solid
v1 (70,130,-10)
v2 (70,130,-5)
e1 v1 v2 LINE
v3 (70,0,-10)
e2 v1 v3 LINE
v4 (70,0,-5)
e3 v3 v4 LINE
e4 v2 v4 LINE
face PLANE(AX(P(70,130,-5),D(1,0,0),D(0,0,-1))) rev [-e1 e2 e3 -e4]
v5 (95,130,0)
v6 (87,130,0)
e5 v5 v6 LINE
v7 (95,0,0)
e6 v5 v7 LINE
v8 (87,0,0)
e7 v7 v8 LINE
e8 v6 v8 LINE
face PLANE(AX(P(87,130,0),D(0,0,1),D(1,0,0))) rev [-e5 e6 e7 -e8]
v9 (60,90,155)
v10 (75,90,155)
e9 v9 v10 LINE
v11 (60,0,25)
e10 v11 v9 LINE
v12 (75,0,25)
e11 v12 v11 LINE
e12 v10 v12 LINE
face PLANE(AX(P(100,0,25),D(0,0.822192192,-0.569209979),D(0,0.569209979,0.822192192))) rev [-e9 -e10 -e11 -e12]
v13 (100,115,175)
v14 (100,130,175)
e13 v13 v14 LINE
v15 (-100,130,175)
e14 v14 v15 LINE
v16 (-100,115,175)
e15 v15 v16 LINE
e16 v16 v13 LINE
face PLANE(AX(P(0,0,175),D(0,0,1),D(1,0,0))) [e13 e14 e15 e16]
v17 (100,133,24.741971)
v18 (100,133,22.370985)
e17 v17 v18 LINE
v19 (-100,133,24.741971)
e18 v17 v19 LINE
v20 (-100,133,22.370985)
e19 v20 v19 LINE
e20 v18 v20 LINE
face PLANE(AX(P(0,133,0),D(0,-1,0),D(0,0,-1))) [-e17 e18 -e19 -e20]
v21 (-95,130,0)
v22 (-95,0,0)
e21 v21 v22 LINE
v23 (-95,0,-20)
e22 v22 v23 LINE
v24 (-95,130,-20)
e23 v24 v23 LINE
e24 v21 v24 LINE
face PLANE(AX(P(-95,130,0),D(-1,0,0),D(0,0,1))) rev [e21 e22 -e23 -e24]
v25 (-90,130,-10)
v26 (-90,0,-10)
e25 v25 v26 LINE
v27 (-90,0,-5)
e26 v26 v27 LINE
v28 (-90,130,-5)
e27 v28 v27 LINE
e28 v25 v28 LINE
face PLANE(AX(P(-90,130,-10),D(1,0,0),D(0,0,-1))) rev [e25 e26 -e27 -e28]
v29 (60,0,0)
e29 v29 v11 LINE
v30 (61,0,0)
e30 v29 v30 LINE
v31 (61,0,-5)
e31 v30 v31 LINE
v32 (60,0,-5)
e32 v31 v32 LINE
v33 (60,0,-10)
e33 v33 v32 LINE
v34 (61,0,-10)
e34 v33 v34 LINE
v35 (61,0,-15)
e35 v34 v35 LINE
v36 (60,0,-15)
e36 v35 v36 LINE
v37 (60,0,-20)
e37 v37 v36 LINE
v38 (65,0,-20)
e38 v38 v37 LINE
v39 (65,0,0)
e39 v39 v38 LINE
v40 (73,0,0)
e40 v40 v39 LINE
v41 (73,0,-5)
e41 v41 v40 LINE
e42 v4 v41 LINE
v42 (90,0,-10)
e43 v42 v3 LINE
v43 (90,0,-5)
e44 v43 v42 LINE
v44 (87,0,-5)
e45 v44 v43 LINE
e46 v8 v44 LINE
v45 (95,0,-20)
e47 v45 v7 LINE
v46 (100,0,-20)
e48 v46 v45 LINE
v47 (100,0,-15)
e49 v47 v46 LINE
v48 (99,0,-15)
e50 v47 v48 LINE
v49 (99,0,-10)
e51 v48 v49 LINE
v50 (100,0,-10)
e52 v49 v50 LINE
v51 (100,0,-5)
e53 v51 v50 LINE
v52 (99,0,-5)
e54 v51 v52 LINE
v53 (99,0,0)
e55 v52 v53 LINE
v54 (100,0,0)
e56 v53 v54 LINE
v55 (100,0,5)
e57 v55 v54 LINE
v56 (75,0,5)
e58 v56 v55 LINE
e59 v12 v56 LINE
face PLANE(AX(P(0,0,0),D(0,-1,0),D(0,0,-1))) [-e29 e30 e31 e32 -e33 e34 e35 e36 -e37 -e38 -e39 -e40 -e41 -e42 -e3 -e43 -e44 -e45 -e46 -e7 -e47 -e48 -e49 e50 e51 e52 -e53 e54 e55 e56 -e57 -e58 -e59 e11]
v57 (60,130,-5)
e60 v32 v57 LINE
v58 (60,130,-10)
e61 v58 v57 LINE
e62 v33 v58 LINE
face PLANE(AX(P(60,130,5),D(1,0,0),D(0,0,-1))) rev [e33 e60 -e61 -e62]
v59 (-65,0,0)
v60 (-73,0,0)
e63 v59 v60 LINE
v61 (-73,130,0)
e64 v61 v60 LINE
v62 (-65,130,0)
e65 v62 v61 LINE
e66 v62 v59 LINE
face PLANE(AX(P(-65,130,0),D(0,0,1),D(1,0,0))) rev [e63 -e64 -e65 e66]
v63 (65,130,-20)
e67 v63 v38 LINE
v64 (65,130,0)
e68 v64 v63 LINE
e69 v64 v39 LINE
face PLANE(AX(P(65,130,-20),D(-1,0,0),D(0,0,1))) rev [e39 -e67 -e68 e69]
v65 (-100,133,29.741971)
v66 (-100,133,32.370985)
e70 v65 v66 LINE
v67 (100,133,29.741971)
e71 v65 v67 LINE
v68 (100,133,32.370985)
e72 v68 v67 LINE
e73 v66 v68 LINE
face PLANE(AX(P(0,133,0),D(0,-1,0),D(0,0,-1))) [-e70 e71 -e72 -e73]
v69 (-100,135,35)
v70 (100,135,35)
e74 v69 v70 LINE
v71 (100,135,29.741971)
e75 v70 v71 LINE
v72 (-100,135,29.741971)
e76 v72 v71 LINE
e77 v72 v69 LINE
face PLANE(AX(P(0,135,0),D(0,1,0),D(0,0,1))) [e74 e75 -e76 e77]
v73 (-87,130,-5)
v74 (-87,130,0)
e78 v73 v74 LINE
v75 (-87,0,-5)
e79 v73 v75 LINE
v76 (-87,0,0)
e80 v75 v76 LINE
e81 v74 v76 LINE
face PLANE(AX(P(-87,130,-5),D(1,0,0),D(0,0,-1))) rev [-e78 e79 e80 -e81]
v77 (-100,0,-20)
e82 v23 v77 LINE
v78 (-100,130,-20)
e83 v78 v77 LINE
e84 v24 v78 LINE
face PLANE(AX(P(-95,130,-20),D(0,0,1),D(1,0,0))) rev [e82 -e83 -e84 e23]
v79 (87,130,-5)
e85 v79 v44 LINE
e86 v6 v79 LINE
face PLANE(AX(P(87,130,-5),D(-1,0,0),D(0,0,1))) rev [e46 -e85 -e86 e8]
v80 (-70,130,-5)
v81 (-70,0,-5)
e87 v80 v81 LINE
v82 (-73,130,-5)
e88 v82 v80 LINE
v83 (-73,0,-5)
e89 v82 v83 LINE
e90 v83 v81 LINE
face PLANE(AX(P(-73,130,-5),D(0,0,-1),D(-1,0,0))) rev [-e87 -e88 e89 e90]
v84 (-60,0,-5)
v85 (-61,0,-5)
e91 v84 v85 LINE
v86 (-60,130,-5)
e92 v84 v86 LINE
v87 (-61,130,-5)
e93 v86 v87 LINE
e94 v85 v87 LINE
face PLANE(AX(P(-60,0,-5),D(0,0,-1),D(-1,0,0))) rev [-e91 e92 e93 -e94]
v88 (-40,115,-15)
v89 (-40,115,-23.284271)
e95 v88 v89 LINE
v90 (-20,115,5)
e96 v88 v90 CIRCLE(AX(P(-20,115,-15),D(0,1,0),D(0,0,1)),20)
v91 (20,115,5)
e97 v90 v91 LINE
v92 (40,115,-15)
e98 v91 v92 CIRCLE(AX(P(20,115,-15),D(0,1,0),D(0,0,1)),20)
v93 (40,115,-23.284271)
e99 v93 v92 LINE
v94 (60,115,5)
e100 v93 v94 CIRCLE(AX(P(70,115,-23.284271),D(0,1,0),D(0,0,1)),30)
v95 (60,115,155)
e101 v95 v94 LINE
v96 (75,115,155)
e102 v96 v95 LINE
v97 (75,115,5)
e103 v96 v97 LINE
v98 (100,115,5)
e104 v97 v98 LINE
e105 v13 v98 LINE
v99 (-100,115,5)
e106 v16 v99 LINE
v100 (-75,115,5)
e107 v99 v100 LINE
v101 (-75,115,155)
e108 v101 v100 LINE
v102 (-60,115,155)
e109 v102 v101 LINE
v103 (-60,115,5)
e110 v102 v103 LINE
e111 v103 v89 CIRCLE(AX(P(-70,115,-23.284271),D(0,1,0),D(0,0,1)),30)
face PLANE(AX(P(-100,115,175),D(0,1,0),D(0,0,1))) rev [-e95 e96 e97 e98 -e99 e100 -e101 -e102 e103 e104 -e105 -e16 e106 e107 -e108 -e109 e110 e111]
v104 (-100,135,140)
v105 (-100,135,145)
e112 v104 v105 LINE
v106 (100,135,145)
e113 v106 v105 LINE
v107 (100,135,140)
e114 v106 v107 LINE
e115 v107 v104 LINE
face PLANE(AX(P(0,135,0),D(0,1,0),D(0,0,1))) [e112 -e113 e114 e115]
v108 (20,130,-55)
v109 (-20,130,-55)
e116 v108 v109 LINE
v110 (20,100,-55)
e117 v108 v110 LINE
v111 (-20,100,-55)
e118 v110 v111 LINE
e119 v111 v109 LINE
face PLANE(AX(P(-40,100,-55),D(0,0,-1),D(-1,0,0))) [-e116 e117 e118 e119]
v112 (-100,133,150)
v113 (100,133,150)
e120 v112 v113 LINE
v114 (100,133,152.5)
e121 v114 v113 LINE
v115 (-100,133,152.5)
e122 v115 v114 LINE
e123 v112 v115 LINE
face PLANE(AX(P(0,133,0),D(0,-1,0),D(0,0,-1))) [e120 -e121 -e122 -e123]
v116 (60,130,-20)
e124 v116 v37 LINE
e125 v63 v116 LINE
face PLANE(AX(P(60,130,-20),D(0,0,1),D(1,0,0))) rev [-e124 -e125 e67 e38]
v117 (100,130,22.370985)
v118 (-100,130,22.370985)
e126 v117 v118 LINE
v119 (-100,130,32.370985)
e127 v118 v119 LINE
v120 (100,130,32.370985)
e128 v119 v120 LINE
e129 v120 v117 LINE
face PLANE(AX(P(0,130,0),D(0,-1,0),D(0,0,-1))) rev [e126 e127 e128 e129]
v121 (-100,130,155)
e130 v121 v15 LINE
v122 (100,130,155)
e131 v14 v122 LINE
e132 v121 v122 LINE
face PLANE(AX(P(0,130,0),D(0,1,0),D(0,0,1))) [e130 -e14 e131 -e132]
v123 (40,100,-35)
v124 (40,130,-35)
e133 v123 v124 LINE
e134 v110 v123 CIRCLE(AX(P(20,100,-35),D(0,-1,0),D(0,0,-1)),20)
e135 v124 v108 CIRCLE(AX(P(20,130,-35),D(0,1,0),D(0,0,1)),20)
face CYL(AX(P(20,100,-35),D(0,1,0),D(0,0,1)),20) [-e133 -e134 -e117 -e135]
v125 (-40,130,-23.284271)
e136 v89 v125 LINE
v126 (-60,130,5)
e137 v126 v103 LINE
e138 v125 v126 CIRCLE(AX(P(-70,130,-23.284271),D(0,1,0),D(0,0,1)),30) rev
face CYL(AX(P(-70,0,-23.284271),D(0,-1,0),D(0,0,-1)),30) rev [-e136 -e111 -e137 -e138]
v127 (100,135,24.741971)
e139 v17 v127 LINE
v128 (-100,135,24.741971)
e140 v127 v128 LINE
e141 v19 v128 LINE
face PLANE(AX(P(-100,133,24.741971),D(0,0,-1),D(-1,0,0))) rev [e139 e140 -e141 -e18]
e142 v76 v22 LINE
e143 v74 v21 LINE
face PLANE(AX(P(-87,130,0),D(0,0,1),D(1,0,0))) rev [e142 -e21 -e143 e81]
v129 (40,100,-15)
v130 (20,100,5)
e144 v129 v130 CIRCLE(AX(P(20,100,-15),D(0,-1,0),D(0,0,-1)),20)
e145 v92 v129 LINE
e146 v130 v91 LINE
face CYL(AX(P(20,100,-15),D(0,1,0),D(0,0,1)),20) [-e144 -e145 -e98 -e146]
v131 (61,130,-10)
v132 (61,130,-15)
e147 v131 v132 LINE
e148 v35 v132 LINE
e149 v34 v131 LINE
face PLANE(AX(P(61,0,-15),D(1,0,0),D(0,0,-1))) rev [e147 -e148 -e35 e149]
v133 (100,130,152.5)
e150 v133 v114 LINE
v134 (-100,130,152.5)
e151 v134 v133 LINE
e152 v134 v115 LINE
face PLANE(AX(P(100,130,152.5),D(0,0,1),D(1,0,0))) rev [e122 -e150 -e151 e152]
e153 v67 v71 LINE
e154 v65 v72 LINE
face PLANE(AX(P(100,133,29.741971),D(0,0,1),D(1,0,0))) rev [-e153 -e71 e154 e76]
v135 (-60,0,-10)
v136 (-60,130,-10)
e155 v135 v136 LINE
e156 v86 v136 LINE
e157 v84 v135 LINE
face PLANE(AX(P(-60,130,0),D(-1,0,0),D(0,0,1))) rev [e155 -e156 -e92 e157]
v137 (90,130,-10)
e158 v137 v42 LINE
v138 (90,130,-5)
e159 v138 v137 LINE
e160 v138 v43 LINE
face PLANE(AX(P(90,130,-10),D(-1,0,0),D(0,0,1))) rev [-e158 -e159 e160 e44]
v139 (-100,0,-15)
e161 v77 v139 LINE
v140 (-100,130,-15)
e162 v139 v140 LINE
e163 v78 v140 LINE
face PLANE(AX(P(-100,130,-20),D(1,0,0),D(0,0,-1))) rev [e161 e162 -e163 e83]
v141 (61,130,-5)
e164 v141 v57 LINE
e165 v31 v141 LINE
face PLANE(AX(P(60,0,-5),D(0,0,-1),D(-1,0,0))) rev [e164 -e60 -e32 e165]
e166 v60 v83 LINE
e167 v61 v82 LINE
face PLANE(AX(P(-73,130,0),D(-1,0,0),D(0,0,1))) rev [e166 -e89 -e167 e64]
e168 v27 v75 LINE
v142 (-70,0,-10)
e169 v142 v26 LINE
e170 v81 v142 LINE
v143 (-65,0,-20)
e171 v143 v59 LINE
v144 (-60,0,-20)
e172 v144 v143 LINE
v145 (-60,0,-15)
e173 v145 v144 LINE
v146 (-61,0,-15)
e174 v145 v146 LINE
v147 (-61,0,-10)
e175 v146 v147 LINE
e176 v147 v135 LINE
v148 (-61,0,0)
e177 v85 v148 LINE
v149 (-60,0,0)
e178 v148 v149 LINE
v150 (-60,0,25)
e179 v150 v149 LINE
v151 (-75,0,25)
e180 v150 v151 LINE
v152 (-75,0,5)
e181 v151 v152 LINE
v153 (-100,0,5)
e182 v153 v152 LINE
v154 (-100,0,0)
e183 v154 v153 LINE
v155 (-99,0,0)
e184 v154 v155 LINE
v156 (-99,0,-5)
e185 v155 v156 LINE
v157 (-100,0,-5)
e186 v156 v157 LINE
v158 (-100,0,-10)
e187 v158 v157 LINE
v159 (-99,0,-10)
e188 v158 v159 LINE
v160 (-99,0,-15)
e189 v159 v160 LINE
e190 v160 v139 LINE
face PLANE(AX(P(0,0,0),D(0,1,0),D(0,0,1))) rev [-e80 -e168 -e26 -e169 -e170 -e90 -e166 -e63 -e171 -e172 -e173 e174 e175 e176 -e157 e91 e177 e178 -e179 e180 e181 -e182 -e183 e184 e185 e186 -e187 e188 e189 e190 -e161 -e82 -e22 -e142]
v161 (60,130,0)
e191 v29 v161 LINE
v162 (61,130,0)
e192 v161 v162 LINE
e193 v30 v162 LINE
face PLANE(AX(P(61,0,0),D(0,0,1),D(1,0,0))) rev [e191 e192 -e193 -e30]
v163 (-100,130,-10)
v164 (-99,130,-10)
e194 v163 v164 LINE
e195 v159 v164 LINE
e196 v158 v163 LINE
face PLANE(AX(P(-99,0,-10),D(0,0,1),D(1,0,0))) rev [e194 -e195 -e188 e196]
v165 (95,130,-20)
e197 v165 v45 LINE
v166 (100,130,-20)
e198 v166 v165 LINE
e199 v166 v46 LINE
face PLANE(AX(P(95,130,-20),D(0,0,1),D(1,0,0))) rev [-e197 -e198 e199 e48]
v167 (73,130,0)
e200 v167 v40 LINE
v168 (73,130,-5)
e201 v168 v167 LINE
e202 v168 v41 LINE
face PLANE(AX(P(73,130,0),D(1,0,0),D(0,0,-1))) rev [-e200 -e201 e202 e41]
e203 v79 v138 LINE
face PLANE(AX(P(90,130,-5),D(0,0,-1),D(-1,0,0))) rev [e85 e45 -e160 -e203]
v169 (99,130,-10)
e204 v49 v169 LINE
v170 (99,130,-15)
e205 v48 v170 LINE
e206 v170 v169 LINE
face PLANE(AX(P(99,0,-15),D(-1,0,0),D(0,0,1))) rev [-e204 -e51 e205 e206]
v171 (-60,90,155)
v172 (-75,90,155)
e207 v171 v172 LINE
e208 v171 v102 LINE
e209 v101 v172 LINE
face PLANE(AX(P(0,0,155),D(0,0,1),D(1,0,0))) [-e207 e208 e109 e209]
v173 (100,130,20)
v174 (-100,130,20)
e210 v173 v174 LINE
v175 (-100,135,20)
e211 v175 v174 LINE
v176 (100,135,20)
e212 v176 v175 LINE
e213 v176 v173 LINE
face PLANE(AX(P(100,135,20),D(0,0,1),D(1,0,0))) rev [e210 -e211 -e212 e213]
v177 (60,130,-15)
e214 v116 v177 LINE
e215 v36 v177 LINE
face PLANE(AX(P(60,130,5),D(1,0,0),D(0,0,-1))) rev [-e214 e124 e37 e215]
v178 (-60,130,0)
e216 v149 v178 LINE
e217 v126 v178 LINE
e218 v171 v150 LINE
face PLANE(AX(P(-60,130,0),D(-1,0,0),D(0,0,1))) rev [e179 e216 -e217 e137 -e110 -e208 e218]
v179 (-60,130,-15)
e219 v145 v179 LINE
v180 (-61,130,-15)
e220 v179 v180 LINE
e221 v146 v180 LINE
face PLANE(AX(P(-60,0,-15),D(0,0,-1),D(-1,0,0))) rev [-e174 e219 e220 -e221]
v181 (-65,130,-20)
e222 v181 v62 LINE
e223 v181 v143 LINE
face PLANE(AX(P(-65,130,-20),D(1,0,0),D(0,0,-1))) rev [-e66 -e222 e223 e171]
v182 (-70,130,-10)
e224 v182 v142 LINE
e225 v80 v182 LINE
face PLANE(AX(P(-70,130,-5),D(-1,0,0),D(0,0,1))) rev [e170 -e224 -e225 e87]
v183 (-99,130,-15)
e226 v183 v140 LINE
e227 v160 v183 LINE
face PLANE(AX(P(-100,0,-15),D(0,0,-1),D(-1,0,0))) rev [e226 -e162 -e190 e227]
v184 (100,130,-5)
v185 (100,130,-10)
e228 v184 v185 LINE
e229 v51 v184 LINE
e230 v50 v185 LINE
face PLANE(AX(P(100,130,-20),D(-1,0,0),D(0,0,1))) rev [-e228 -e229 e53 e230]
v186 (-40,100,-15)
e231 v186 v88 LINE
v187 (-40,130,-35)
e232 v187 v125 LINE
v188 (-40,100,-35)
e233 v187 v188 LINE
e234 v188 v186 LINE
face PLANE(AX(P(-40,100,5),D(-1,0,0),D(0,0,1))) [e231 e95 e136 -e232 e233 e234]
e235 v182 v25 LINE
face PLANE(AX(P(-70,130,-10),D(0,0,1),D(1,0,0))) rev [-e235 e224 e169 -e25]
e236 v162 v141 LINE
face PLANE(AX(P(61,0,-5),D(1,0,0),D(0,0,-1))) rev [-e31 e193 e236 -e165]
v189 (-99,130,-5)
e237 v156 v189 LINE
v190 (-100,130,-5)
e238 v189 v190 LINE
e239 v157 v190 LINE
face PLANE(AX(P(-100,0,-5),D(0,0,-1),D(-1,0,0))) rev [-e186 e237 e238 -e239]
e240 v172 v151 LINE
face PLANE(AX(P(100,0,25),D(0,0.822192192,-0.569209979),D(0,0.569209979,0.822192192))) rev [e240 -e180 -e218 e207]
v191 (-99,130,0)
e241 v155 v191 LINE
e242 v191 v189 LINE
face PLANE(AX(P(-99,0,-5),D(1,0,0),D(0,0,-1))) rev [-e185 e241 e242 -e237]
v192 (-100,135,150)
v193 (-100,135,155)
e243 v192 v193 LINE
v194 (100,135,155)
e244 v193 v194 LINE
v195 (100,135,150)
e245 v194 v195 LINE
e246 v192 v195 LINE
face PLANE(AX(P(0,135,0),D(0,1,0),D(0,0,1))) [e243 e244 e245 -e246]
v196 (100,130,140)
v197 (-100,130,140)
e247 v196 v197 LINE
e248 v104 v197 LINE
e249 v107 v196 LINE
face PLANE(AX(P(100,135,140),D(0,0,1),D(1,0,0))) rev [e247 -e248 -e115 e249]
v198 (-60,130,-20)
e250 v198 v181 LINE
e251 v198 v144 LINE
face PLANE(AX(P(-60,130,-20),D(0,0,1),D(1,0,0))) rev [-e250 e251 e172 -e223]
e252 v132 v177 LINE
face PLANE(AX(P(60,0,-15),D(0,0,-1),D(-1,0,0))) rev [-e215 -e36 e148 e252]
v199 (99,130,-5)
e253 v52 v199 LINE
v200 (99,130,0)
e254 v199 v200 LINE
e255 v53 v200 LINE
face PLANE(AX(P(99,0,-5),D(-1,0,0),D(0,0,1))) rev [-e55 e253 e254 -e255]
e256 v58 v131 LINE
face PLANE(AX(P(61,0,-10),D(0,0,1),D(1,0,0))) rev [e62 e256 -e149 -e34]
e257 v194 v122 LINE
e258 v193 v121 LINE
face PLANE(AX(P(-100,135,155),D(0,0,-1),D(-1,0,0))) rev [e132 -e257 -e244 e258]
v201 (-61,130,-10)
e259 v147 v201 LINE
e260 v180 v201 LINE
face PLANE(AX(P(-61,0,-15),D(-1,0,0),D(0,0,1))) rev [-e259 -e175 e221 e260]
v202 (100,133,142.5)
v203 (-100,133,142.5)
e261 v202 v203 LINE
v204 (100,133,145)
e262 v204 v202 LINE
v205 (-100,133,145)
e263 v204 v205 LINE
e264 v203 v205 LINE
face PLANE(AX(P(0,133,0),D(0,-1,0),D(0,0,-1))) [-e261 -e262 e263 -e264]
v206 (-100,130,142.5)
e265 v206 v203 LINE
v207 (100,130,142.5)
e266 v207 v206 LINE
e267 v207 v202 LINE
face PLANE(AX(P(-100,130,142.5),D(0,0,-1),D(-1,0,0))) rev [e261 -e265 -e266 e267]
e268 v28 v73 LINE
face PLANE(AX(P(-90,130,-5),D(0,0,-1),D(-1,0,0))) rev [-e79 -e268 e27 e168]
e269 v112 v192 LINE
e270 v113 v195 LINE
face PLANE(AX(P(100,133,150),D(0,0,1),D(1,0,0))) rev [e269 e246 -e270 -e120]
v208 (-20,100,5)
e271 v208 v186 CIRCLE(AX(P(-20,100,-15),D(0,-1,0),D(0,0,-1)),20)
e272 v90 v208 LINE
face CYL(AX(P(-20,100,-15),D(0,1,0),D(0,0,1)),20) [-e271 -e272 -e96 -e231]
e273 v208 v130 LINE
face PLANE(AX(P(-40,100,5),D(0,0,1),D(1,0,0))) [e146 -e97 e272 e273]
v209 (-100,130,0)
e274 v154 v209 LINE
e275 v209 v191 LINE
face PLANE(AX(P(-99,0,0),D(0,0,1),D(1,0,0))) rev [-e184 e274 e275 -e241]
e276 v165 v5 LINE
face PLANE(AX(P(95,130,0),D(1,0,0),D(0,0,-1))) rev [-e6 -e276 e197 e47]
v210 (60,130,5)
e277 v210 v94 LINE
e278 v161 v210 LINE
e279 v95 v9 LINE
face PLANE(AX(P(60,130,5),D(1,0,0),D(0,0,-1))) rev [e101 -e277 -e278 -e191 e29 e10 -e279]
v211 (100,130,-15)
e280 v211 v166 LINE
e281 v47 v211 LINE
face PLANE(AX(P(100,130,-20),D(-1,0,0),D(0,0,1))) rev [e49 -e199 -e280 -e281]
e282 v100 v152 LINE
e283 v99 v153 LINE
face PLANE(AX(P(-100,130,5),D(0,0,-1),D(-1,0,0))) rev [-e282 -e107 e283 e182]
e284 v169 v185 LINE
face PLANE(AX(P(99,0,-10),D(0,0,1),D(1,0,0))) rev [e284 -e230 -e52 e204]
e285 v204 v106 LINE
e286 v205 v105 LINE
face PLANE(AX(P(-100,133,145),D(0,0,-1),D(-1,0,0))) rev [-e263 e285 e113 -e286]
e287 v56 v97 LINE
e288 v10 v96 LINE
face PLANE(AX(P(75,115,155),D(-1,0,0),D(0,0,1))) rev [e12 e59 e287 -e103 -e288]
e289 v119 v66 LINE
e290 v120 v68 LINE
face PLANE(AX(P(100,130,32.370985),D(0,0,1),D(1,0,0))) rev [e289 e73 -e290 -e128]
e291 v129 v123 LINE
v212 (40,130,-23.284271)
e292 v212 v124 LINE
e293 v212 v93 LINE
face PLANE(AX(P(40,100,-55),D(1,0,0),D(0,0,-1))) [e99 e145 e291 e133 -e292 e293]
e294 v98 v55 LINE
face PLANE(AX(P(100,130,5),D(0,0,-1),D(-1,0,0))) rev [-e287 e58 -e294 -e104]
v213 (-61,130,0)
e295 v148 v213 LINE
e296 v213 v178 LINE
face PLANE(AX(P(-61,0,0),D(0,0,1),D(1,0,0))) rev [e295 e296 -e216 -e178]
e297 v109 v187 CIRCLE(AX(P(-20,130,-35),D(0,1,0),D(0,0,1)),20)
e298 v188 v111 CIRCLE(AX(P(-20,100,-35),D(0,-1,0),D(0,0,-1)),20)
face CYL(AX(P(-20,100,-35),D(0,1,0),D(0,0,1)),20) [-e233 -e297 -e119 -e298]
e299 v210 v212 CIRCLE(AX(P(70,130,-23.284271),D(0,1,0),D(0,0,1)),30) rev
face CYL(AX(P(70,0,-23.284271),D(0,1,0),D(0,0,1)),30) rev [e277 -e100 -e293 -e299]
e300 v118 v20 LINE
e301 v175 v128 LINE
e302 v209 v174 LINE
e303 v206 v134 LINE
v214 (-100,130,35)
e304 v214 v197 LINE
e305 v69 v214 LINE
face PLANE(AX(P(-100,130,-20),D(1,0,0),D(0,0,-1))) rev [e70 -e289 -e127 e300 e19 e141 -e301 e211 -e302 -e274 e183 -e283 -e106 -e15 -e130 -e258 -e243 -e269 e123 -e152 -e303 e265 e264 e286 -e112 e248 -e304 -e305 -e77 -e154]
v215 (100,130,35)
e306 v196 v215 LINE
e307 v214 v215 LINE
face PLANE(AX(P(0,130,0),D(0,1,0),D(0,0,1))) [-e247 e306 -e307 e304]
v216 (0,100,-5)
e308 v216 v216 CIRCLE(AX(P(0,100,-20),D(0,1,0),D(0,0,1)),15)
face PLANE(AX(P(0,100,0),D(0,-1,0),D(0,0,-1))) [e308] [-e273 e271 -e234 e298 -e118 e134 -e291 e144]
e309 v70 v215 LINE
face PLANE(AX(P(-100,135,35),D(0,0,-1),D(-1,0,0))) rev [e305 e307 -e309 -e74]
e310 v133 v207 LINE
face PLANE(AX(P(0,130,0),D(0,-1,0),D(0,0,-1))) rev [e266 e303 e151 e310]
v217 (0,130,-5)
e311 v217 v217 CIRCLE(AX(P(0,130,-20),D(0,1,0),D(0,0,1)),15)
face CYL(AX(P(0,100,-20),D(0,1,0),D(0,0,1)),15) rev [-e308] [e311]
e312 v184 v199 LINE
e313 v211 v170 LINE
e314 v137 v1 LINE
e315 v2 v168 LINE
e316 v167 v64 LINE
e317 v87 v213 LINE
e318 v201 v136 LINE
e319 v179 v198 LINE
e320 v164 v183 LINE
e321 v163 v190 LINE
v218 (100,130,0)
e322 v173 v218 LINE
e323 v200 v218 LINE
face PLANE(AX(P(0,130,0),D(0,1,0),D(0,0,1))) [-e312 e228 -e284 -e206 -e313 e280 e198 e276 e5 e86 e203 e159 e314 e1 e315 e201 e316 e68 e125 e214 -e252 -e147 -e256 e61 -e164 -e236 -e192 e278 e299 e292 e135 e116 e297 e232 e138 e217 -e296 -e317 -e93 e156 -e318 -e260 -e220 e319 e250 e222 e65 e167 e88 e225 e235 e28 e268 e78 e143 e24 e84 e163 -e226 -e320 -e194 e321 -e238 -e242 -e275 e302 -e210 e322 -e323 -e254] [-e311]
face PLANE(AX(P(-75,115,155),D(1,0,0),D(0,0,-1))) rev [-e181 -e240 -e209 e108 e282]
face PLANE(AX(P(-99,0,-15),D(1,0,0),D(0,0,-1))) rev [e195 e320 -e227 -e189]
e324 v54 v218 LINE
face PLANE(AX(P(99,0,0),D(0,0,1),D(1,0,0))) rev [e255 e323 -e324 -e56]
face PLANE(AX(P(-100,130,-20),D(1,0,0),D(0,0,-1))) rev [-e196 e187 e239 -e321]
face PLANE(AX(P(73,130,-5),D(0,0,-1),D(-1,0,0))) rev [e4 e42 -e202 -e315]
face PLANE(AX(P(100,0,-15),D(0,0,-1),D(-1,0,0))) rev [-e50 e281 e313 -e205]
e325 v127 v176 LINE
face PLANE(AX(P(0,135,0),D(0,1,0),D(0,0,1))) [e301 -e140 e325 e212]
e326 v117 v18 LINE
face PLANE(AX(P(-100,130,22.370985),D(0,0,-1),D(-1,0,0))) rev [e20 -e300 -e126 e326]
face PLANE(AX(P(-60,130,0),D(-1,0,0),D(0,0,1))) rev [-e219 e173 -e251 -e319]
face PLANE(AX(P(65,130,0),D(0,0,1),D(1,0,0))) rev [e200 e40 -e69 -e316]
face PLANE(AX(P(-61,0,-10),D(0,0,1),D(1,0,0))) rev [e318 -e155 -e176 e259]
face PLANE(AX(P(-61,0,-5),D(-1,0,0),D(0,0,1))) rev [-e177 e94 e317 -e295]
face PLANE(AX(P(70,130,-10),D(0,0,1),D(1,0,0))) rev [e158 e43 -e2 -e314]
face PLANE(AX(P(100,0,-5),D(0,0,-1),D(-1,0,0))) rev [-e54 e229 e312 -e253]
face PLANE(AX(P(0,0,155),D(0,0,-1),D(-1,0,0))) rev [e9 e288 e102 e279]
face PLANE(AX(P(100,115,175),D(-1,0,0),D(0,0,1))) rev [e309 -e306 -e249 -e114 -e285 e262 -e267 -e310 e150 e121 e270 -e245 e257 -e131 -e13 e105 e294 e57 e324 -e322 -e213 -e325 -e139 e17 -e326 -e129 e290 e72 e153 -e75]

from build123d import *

# Parameters (mm, degrees)
EXTRUDE_1_DEPTH     = 130
EXTRUDE_1_2_DEPTH   = 130
SKETCH_3_W          = 1
SKETCH_3_H          = 5
CUT_EXTRUDE_3_DEPTH = 166.227116419
SKETCH_5_W          = 200
SKETCH_5_H          = 15
EXTRUDE_2_DEPTH     = 170
SKETCH_6_W          = 15
SKETCH_6_H          = 115
EXTRUDE_3_DEPTH     = 150
CUT_EXTRUDE_4_DEPTH = 280.55321497
SKETCH_8_W          = 80
SKETCH_8_H          = 60
SKETCH_8_R          = 15
EXTRUDE_4_DEPTH     = 30
FILLET_1_R          = 30
FILLET_3_R          = 20
SKETCH_9_W          = 200
SKETCH_9_H          = 15
EXTRUDE_5_DEPTH     = 5
SKETCH_10_W         = 200
SKETCH_10_H         = 5
CUT_EXTRUDE_5_DEPTH = 2
SKETCH_11_W         = 200
SKETCH_11_H         = 10
CUT_EXTRUDE_6_DEPTH = 3


with BuildPart() as part:
    # 草图1 → 凸台-拉伸1 (new body)
    with BuildSketch(Plane(origin=(0, 0, 0), x_dir=(1, 0, 0), z_dir=(0, 1, 0))):
        Polygon((-60, 0), (-60, 20), (-65, 20), (-65, 0), (-73, 0), (-73, 5), (-70, 5), (-70, 10), (-90, 10), (-90, 5), (-87, 5), (-87, 0), (-95, 0), (-95, 20), (-100, 20), (-100, -5), (-60, -5), align=None)
    extrude(amount=EXTRUDE_1_DEPTH)


with BuildPart() as body_2:
    # 草图1 → Extrude 1 2 (new body)
    with BuildSketch(Plane(origin=(0, 0, 0), x_dir=(1, 0, 0), z_dir=(0, 1, 0))):
        Polygon((73, 0), (73, 5), (70, 5), (70, 10), (90, 10), (90, 5), (87, 5), (87, 0), (95, 0), (95, 20), (100, 20), (100, -5), (60, -5), (60, 0), (60, 20), (65, 20), (65, 0), align=None)
    extrude(amount=EXTRUDE_1_2_DEPTH)


with BuildPart() as cut_extrude_3_tool:
    # 草图3 → 切除-拉伸3 (new, through all)
    with BuildSketch(Plane(origin=(0, 130, 0), x_dir=(1, 0, 0), z_dir=(0, 1, 0))):
        with Locations((-99.5, 12.5)):
            Rectangle(SKETCH_3_W, SKETCH_3_H)
        with Locations((-99.5, 2.5)):
            Rectangle(SKETCH_3_W, SKETCH_3_H)
        with Locations((-60.5, 12.5)):
            Rectangle(SKETCH_3_W, SKETCH_3_H)
        with Locations((-60.5, 2.5)):
            Rectangle(SKETCH_3_W, SKETCH_3_H)
        with Locations((60.5, 2.5)):
            Rectangle(SKETCH_3_W, SKETCH_3_H)
        with Locations((60.5, 12.5)):
            Rectangle(SKETCH_3_W, SKETCH_3_H)
        with Locations((99.5, 2.5)):
            Rectangle(SKETCH_3_W, SKETCH_3_H)
        with Locations((99.5, 12.5)):
            Rectangle(SKETCH_3_W, SKETCH_3_H)
    extrude(amount=-CUT_EXTRUDE_3_DEPTH)


with BuildPart() as part_1:
    add(part.part)

    # 切除-拉伸3: cut by cut_extrude_3_tool
    add(cut_extrude_3_tool.part, mode=Mode.SUBTRACT)



with BuildPart() as body_2_1:
    add(body_2.part)

    # 切除-拉伸3: cut by cut_extrude_3_tool
    add(cut_extrude_3_tool.part, mode=Mode.SUBTRACT)


with BuildPart() as part_2:
    add(part_1.part)

    add(body_2_1.part)  # 凸台-拉伸2 merges body 2
    # 草图5 → 凸台-拉伸2 (add)
    with BuildSketch(Plane.XY.offset(5)):
        with Locations((0, 122.5)):
            Rectangle(SKETCH_5_W, SKETCH_5_H)
    extrude(amount=EXTRUDE_2_DEPTH)

    # 草图6 → 凸台-拉伸3 (add)
    with BuildSketch(Plane.XY.offset(5)):
        with Locations((-67.5, 57.5)):
            Rectangle(SKETCH_6_W, SKETCH_6_H)
        with Locations((67.5, 57.5)):
            Rectangle(SKETCH_6_W, SKETCH_6_H)
    extrude(amount=EXTRUDE_3_DEPTH)

    # 草图7 → 切除-拉伸4 (cut, through all)
    with BuildSketch(Plane.ZY.offset(75)):
        Polygon((25, 0), (155, 90), (155, 0), align=None)
    extrude(amount=-CUT_EXTRUDE_4_DEPTH, mode=Mode.SUBTRACT)

    # 草图8 → 凸台-拉伸4 (add)
    with BuildSketch(Plane(origin=(0, 130, 0), x_dir=(1, 0, 0), z_dir=(0, 1, 0))):
        with Locations((0, 25)):
            Rectangle(SKETCH_8_W, SKETCH_8_H)
        with Locations(Location((0, 20, 0), (0, 0, 270))):
            Circle(SKETCH_8_R, mode=Mode.SUBTRACT)
    extrude(amount=-EXTRUDE_4_DEPTH)

    # 圆角1
    # the kernel refuses this fillet: 30 mm, written as the material it adds along each edge
    with BuildSketch(Plane(origin=(40, 130, 5), x_dir=(1, 0, 0), z_dir=(0, -1, 0))) as fillet_1_piece_1:
        with BuildLine():
            CenterArc((30, -28.284271247), FILLET_1_R, 109.471220634, 70.528779366)
            Line((0, -28.284271247), (0, 0))
            Line((0, 0), (20, 0))
        make_face()
    extrude(amount=15)
    with BuildSketch(Plane(origin=(-40, 130, 5), x_dir=(-1, 0, 0), z_dir=(0, -1, 0))) as fillet_1_piece_2:
        with BuildLine():
            CenterArc((30, 28.284271247), FILLET_1_R, 180, 70.528779366)
            Line((0, 28.284271247), (0, 0))
            Line((0, 0), (20, 0))
        make_face()
    extrude(amount=15)

    # 圆角3
    fillet_3_edges = [part_2.edges().sort_by_distance(p)[0] for p in [
        (40, 107.5, 5),
        (-40, 107.5, 5),
        (-40, 115, -55),
        (40, 115, -55),
    ]]
    fillet(fillet_3_edges, radius=FILLET_3_R)

    # 草图9 → 凸台-拉伸5 (add)
    with BuildSketch(Plane(origin=(0, 130, 0), x_dir=(1, 0, 0), z_dir=(0, 1, 0))):
        with Locations((0, -147.5)):
            Rectangle(SKETCH_9_W, SKETCH_9_H)
        with Locations((0, -27.5)):
            Rectangle(SKETCH_9_W, SKETCH_9_H)
    extrude(amount=EXTRUDE_5_DEPTH)

    # 草图10 → 切除-拉伸5 (cut)
    with BuildSketch(Plane(origin=(0, 135, 0), x_dir=(1, 0, 0), z_dir=(0, 1, 0))):
        with Locations((0, -27.241970949)):
            Rectangle(SKETCH_10_W, SKETCH_10_H)
        with Locations((0, -147.5)):
            Rectangle(SKETCH_10_W, SKETCH_10_H)
    extrude(amount=-CUT_EXTRUDE_5_DEPTH, mode=Mode.SUBTRACT)

    # 草图11 → 切除-拉伸6 (cut)
    with BuildSketch(Plane(origin=(0, 133, 0), x_dir=(1, 0, 0), z_dir=(0, 1, 0))):
        with Locations((0, -27.370985475)):
            Rectangle(SKETCH_11_W, SKETCH_11_H)
        with Locations((0, -147.5)):
            Rectangle(SKETCH_11_W, SKETCH_11_H)
    extrude(amount=-CUT_EXTRUDE_6_DEPTH, mode=Mode.SUBTRACT)


solid = part_2.part
